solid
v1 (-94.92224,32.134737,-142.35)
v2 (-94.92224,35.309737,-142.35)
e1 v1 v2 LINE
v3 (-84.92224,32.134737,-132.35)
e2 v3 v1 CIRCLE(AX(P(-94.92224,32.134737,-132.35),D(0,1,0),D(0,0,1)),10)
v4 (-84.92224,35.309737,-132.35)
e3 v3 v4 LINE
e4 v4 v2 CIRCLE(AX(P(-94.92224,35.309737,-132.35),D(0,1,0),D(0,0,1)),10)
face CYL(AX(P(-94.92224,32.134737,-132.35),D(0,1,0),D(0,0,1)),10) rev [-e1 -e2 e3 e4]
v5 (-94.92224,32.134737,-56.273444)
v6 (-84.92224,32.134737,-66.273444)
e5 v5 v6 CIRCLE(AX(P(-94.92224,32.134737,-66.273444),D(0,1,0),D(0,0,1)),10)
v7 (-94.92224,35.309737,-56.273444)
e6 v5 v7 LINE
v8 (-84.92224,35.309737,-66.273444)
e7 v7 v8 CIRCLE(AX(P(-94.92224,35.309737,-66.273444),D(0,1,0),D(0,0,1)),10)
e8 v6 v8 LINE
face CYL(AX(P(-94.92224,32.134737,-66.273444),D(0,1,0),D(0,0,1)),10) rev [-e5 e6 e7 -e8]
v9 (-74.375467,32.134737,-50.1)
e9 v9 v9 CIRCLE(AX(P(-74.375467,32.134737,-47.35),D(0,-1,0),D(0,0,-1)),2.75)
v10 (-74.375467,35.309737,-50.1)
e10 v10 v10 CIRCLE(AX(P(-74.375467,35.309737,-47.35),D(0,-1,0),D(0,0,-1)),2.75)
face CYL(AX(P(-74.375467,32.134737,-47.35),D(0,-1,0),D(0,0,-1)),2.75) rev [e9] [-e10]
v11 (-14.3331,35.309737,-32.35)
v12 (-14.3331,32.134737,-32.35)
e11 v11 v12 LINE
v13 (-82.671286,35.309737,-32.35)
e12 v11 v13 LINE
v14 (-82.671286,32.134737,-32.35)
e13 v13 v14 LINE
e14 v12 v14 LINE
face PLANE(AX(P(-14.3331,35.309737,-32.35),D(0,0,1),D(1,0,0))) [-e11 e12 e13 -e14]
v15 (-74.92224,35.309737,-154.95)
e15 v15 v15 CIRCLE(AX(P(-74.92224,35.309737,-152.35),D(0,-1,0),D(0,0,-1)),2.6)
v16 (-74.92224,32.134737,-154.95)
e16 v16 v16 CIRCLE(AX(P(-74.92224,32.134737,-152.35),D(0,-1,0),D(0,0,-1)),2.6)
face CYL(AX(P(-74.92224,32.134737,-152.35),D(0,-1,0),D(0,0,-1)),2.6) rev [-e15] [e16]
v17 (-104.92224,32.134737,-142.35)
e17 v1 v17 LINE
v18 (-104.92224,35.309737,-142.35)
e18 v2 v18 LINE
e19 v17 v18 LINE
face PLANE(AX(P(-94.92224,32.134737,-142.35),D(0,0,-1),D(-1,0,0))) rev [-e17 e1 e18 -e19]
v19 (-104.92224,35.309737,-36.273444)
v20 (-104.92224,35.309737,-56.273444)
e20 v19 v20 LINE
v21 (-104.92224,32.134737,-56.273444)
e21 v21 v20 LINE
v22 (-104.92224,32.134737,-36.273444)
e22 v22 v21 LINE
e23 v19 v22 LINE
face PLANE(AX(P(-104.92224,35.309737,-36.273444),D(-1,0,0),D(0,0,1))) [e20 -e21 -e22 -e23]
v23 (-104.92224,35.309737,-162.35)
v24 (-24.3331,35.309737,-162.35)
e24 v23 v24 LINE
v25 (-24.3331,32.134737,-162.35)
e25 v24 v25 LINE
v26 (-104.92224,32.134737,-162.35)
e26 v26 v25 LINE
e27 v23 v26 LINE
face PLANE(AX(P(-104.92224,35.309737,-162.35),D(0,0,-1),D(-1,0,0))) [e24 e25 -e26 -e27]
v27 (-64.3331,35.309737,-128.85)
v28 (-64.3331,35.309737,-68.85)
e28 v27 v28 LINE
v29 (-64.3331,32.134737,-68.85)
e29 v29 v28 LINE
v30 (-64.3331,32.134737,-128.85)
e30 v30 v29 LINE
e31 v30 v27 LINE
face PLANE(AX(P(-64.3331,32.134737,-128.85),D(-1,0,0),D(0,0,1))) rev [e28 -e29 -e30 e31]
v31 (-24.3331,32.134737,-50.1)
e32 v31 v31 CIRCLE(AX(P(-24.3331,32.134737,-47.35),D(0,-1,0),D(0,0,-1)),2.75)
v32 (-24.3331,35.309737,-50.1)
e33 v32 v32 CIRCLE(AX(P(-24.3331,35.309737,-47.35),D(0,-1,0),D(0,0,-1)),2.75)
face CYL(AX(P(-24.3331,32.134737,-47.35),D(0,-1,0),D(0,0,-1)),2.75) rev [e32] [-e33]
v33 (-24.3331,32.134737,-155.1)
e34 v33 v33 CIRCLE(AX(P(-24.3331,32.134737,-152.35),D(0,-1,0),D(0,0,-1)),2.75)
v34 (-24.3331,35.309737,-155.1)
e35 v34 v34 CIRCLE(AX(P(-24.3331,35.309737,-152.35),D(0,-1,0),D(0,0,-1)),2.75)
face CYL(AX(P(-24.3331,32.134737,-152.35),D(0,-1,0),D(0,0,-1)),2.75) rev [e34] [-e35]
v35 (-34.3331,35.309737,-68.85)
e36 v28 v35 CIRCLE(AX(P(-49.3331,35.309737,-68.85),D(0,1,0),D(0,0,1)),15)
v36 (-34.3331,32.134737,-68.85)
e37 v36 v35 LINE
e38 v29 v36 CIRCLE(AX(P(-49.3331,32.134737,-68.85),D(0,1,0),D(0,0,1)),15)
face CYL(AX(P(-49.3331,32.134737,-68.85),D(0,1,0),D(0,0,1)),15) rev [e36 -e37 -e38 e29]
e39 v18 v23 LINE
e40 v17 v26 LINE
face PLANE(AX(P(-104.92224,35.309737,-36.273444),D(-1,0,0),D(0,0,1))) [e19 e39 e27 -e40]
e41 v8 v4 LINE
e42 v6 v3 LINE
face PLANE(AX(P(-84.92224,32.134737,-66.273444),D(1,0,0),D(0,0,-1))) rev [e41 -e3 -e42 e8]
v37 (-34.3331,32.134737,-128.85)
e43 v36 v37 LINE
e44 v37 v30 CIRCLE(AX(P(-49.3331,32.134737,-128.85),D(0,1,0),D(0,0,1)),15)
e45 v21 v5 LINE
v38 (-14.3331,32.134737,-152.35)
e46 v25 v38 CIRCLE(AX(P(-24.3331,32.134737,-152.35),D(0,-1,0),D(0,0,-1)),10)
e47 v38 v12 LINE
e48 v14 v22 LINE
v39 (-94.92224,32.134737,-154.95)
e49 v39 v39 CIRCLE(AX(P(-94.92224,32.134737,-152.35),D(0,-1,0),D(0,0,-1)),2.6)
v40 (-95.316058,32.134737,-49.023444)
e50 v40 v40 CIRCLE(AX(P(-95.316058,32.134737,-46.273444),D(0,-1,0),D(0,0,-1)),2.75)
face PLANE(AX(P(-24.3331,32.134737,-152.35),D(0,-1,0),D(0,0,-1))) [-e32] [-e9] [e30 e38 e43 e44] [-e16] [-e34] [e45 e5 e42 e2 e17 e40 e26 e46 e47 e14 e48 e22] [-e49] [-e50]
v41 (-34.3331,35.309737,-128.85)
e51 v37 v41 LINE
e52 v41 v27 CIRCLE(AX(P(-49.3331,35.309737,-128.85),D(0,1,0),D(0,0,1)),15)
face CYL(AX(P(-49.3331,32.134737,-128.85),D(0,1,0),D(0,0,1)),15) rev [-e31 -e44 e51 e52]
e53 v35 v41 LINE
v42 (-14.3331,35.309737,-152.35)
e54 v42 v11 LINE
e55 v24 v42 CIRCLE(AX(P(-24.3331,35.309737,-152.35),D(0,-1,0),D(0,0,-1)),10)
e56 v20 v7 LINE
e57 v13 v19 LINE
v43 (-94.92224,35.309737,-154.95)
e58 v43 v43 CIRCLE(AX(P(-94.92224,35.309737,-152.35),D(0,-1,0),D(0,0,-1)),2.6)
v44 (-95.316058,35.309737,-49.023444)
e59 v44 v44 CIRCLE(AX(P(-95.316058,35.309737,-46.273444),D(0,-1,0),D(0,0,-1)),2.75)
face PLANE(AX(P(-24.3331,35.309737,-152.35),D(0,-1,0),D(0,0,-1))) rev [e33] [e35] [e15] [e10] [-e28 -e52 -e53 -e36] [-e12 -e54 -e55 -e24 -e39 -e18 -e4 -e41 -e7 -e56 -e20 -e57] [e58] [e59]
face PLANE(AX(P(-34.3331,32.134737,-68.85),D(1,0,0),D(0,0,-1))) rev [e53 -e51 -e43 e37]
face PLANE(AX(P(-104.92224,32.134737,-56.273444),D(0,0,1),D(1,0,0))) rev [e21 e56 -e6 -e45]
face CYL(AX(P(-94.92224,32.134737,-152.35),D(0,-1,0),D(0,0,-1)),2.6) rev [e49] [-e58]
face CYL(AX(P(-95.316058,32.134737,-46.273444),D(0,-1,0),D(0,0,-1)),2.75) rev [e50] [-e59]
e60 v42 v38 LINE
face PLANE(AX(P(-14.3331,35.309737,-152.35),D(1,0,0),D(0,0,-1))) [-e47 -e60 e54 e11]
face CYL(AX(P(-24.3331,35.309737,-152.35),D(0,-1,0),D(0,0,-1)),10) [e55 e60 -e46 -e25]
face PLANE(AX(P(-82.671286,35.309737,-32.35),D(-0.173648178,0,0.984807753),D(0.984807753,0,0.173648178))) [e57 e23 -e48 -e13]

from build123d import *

# Parameters (mm, degrees)
BASE_FLANGE1_DEPTH         = 3.175
CUT_EXTRUDE1_DEPTH         = 194.329458355
CUT_EXTRUDE2_DEPTH         = 194.329458355
F_5_2_5_2_DIAMETER_HOLE1_D = 5.2
F_5_5_5_5_DIAMETER_HOLE1_D = 5.5


# Sheet-metal steps are written as plain solids
with BuildPart() as part:
    # Sketch11 → Base-Flange1 (new body)
    with BuildSketch(Plane.XZ.offset(-32.134736729)):
        with BuildLine():
            Line((-82.671285527, -32.35), (-104.922239506, -36.273443533))
            Line((-104.922239506, -36.273443533), (-104.922239506, -162.35))
            Line((-104.922239506, -162.35), (-24.333100178, -162.35))
            ThreePointArc((-24.333100178, -162.35), (-17.262032366, -159.421067812), (-14.333100178, -152.35))
            Line((-14.333100178, -152.35), (-14.333100178, -32.35))
            Line((-14.333100178, -32.35), (-82.671285527, -32.35))
        make_face()
    extrude(amount=-BASE_FLANGE1_DEPTH)

    # Sketch16 → Cut-Extrude1 (cut, through all)
    with BuildSketch(Plane(origin=(0, 35.309736729, 0), x_dir=(-1, 0, 0), z_dir=(0, 1, 0))):
        with BuildLine():
            Line((104.922239506, -142.35), (104.922239506, -56.273443533))
            Line((104.922239506, -56.273443533), (94.922239506, -56.273443533))
            ThreePointArc((94.922239506, -56.273443533), (87.851171694, -59.202375721), (84.922239506, -66.273443533))
            Line((84.922239506, -66.273443533), (84.922239506, -132.35))
            ThreePointArc((84.922239506, -132.35), (87.851171694, -139.421067812), (94.922239506, -142.35))
            Line((94.922239506, -142.35), (104.922239506, -142.35))
        make_face()
    extrude(amount=-CUT_EXTRUDE1_DEPTH, mode=Mode.SUBTRACT)

    # Sketch17 → Cut-Extrude2 (cut, through all)
    with BuildSketch(Plane(origin=(0, 35.309736729, 0), x_dir=(-1, 0, 0), z_dir=(0, 1, 0))):
        with BuildLine():
            Line((64.333100178, -128.85), (64.333100178, -68.85))
            ThreePointArc((64.333100178, -68.85), (49.333100178, -53.85), (34.333100178, -68.85))
            Line((34.333100178, -68.85), (34.333100178, -128.85))
            ThreePointArc((34.333100178, -128.85), (49.333100178, -143.85), (64.333100178, -128.85))
        make_face()
    extrude(amount=-CUT_EXTRUDE2_DEPTH, mode=Mode.SUBTRACT)

    # Ø5.2 (5.2) Diameter Hole1 (through all)
    with Locations(Plane(origin=(0, 32.134736729, 0), x_dir=(-1, 0, 0), z_dir=(0, -1, 0))):
        with Locations((94.922239506, 152.35), (74.922239506, 152.35)):
            Hole(F_5_2_5_2_DIAMETER_HOLE1_D / 2)

    # Ø5.5 (5.5) Diameter Hole1 (through all)
    with Locations(Plane(origin=(0, 32.134736729, 0), x_dir=(-1, 0, 0), z_dir=(0, -1, 0))):
        with Locations((95.316058397, 46.273443533), (74.375466886, 47.35), (24.333100178, 47.35), (24.333100178, 152.35)):
            Hole(F_5_5_5_5_DIAMETER_HOLE1_D / 2)


solid = part.part
